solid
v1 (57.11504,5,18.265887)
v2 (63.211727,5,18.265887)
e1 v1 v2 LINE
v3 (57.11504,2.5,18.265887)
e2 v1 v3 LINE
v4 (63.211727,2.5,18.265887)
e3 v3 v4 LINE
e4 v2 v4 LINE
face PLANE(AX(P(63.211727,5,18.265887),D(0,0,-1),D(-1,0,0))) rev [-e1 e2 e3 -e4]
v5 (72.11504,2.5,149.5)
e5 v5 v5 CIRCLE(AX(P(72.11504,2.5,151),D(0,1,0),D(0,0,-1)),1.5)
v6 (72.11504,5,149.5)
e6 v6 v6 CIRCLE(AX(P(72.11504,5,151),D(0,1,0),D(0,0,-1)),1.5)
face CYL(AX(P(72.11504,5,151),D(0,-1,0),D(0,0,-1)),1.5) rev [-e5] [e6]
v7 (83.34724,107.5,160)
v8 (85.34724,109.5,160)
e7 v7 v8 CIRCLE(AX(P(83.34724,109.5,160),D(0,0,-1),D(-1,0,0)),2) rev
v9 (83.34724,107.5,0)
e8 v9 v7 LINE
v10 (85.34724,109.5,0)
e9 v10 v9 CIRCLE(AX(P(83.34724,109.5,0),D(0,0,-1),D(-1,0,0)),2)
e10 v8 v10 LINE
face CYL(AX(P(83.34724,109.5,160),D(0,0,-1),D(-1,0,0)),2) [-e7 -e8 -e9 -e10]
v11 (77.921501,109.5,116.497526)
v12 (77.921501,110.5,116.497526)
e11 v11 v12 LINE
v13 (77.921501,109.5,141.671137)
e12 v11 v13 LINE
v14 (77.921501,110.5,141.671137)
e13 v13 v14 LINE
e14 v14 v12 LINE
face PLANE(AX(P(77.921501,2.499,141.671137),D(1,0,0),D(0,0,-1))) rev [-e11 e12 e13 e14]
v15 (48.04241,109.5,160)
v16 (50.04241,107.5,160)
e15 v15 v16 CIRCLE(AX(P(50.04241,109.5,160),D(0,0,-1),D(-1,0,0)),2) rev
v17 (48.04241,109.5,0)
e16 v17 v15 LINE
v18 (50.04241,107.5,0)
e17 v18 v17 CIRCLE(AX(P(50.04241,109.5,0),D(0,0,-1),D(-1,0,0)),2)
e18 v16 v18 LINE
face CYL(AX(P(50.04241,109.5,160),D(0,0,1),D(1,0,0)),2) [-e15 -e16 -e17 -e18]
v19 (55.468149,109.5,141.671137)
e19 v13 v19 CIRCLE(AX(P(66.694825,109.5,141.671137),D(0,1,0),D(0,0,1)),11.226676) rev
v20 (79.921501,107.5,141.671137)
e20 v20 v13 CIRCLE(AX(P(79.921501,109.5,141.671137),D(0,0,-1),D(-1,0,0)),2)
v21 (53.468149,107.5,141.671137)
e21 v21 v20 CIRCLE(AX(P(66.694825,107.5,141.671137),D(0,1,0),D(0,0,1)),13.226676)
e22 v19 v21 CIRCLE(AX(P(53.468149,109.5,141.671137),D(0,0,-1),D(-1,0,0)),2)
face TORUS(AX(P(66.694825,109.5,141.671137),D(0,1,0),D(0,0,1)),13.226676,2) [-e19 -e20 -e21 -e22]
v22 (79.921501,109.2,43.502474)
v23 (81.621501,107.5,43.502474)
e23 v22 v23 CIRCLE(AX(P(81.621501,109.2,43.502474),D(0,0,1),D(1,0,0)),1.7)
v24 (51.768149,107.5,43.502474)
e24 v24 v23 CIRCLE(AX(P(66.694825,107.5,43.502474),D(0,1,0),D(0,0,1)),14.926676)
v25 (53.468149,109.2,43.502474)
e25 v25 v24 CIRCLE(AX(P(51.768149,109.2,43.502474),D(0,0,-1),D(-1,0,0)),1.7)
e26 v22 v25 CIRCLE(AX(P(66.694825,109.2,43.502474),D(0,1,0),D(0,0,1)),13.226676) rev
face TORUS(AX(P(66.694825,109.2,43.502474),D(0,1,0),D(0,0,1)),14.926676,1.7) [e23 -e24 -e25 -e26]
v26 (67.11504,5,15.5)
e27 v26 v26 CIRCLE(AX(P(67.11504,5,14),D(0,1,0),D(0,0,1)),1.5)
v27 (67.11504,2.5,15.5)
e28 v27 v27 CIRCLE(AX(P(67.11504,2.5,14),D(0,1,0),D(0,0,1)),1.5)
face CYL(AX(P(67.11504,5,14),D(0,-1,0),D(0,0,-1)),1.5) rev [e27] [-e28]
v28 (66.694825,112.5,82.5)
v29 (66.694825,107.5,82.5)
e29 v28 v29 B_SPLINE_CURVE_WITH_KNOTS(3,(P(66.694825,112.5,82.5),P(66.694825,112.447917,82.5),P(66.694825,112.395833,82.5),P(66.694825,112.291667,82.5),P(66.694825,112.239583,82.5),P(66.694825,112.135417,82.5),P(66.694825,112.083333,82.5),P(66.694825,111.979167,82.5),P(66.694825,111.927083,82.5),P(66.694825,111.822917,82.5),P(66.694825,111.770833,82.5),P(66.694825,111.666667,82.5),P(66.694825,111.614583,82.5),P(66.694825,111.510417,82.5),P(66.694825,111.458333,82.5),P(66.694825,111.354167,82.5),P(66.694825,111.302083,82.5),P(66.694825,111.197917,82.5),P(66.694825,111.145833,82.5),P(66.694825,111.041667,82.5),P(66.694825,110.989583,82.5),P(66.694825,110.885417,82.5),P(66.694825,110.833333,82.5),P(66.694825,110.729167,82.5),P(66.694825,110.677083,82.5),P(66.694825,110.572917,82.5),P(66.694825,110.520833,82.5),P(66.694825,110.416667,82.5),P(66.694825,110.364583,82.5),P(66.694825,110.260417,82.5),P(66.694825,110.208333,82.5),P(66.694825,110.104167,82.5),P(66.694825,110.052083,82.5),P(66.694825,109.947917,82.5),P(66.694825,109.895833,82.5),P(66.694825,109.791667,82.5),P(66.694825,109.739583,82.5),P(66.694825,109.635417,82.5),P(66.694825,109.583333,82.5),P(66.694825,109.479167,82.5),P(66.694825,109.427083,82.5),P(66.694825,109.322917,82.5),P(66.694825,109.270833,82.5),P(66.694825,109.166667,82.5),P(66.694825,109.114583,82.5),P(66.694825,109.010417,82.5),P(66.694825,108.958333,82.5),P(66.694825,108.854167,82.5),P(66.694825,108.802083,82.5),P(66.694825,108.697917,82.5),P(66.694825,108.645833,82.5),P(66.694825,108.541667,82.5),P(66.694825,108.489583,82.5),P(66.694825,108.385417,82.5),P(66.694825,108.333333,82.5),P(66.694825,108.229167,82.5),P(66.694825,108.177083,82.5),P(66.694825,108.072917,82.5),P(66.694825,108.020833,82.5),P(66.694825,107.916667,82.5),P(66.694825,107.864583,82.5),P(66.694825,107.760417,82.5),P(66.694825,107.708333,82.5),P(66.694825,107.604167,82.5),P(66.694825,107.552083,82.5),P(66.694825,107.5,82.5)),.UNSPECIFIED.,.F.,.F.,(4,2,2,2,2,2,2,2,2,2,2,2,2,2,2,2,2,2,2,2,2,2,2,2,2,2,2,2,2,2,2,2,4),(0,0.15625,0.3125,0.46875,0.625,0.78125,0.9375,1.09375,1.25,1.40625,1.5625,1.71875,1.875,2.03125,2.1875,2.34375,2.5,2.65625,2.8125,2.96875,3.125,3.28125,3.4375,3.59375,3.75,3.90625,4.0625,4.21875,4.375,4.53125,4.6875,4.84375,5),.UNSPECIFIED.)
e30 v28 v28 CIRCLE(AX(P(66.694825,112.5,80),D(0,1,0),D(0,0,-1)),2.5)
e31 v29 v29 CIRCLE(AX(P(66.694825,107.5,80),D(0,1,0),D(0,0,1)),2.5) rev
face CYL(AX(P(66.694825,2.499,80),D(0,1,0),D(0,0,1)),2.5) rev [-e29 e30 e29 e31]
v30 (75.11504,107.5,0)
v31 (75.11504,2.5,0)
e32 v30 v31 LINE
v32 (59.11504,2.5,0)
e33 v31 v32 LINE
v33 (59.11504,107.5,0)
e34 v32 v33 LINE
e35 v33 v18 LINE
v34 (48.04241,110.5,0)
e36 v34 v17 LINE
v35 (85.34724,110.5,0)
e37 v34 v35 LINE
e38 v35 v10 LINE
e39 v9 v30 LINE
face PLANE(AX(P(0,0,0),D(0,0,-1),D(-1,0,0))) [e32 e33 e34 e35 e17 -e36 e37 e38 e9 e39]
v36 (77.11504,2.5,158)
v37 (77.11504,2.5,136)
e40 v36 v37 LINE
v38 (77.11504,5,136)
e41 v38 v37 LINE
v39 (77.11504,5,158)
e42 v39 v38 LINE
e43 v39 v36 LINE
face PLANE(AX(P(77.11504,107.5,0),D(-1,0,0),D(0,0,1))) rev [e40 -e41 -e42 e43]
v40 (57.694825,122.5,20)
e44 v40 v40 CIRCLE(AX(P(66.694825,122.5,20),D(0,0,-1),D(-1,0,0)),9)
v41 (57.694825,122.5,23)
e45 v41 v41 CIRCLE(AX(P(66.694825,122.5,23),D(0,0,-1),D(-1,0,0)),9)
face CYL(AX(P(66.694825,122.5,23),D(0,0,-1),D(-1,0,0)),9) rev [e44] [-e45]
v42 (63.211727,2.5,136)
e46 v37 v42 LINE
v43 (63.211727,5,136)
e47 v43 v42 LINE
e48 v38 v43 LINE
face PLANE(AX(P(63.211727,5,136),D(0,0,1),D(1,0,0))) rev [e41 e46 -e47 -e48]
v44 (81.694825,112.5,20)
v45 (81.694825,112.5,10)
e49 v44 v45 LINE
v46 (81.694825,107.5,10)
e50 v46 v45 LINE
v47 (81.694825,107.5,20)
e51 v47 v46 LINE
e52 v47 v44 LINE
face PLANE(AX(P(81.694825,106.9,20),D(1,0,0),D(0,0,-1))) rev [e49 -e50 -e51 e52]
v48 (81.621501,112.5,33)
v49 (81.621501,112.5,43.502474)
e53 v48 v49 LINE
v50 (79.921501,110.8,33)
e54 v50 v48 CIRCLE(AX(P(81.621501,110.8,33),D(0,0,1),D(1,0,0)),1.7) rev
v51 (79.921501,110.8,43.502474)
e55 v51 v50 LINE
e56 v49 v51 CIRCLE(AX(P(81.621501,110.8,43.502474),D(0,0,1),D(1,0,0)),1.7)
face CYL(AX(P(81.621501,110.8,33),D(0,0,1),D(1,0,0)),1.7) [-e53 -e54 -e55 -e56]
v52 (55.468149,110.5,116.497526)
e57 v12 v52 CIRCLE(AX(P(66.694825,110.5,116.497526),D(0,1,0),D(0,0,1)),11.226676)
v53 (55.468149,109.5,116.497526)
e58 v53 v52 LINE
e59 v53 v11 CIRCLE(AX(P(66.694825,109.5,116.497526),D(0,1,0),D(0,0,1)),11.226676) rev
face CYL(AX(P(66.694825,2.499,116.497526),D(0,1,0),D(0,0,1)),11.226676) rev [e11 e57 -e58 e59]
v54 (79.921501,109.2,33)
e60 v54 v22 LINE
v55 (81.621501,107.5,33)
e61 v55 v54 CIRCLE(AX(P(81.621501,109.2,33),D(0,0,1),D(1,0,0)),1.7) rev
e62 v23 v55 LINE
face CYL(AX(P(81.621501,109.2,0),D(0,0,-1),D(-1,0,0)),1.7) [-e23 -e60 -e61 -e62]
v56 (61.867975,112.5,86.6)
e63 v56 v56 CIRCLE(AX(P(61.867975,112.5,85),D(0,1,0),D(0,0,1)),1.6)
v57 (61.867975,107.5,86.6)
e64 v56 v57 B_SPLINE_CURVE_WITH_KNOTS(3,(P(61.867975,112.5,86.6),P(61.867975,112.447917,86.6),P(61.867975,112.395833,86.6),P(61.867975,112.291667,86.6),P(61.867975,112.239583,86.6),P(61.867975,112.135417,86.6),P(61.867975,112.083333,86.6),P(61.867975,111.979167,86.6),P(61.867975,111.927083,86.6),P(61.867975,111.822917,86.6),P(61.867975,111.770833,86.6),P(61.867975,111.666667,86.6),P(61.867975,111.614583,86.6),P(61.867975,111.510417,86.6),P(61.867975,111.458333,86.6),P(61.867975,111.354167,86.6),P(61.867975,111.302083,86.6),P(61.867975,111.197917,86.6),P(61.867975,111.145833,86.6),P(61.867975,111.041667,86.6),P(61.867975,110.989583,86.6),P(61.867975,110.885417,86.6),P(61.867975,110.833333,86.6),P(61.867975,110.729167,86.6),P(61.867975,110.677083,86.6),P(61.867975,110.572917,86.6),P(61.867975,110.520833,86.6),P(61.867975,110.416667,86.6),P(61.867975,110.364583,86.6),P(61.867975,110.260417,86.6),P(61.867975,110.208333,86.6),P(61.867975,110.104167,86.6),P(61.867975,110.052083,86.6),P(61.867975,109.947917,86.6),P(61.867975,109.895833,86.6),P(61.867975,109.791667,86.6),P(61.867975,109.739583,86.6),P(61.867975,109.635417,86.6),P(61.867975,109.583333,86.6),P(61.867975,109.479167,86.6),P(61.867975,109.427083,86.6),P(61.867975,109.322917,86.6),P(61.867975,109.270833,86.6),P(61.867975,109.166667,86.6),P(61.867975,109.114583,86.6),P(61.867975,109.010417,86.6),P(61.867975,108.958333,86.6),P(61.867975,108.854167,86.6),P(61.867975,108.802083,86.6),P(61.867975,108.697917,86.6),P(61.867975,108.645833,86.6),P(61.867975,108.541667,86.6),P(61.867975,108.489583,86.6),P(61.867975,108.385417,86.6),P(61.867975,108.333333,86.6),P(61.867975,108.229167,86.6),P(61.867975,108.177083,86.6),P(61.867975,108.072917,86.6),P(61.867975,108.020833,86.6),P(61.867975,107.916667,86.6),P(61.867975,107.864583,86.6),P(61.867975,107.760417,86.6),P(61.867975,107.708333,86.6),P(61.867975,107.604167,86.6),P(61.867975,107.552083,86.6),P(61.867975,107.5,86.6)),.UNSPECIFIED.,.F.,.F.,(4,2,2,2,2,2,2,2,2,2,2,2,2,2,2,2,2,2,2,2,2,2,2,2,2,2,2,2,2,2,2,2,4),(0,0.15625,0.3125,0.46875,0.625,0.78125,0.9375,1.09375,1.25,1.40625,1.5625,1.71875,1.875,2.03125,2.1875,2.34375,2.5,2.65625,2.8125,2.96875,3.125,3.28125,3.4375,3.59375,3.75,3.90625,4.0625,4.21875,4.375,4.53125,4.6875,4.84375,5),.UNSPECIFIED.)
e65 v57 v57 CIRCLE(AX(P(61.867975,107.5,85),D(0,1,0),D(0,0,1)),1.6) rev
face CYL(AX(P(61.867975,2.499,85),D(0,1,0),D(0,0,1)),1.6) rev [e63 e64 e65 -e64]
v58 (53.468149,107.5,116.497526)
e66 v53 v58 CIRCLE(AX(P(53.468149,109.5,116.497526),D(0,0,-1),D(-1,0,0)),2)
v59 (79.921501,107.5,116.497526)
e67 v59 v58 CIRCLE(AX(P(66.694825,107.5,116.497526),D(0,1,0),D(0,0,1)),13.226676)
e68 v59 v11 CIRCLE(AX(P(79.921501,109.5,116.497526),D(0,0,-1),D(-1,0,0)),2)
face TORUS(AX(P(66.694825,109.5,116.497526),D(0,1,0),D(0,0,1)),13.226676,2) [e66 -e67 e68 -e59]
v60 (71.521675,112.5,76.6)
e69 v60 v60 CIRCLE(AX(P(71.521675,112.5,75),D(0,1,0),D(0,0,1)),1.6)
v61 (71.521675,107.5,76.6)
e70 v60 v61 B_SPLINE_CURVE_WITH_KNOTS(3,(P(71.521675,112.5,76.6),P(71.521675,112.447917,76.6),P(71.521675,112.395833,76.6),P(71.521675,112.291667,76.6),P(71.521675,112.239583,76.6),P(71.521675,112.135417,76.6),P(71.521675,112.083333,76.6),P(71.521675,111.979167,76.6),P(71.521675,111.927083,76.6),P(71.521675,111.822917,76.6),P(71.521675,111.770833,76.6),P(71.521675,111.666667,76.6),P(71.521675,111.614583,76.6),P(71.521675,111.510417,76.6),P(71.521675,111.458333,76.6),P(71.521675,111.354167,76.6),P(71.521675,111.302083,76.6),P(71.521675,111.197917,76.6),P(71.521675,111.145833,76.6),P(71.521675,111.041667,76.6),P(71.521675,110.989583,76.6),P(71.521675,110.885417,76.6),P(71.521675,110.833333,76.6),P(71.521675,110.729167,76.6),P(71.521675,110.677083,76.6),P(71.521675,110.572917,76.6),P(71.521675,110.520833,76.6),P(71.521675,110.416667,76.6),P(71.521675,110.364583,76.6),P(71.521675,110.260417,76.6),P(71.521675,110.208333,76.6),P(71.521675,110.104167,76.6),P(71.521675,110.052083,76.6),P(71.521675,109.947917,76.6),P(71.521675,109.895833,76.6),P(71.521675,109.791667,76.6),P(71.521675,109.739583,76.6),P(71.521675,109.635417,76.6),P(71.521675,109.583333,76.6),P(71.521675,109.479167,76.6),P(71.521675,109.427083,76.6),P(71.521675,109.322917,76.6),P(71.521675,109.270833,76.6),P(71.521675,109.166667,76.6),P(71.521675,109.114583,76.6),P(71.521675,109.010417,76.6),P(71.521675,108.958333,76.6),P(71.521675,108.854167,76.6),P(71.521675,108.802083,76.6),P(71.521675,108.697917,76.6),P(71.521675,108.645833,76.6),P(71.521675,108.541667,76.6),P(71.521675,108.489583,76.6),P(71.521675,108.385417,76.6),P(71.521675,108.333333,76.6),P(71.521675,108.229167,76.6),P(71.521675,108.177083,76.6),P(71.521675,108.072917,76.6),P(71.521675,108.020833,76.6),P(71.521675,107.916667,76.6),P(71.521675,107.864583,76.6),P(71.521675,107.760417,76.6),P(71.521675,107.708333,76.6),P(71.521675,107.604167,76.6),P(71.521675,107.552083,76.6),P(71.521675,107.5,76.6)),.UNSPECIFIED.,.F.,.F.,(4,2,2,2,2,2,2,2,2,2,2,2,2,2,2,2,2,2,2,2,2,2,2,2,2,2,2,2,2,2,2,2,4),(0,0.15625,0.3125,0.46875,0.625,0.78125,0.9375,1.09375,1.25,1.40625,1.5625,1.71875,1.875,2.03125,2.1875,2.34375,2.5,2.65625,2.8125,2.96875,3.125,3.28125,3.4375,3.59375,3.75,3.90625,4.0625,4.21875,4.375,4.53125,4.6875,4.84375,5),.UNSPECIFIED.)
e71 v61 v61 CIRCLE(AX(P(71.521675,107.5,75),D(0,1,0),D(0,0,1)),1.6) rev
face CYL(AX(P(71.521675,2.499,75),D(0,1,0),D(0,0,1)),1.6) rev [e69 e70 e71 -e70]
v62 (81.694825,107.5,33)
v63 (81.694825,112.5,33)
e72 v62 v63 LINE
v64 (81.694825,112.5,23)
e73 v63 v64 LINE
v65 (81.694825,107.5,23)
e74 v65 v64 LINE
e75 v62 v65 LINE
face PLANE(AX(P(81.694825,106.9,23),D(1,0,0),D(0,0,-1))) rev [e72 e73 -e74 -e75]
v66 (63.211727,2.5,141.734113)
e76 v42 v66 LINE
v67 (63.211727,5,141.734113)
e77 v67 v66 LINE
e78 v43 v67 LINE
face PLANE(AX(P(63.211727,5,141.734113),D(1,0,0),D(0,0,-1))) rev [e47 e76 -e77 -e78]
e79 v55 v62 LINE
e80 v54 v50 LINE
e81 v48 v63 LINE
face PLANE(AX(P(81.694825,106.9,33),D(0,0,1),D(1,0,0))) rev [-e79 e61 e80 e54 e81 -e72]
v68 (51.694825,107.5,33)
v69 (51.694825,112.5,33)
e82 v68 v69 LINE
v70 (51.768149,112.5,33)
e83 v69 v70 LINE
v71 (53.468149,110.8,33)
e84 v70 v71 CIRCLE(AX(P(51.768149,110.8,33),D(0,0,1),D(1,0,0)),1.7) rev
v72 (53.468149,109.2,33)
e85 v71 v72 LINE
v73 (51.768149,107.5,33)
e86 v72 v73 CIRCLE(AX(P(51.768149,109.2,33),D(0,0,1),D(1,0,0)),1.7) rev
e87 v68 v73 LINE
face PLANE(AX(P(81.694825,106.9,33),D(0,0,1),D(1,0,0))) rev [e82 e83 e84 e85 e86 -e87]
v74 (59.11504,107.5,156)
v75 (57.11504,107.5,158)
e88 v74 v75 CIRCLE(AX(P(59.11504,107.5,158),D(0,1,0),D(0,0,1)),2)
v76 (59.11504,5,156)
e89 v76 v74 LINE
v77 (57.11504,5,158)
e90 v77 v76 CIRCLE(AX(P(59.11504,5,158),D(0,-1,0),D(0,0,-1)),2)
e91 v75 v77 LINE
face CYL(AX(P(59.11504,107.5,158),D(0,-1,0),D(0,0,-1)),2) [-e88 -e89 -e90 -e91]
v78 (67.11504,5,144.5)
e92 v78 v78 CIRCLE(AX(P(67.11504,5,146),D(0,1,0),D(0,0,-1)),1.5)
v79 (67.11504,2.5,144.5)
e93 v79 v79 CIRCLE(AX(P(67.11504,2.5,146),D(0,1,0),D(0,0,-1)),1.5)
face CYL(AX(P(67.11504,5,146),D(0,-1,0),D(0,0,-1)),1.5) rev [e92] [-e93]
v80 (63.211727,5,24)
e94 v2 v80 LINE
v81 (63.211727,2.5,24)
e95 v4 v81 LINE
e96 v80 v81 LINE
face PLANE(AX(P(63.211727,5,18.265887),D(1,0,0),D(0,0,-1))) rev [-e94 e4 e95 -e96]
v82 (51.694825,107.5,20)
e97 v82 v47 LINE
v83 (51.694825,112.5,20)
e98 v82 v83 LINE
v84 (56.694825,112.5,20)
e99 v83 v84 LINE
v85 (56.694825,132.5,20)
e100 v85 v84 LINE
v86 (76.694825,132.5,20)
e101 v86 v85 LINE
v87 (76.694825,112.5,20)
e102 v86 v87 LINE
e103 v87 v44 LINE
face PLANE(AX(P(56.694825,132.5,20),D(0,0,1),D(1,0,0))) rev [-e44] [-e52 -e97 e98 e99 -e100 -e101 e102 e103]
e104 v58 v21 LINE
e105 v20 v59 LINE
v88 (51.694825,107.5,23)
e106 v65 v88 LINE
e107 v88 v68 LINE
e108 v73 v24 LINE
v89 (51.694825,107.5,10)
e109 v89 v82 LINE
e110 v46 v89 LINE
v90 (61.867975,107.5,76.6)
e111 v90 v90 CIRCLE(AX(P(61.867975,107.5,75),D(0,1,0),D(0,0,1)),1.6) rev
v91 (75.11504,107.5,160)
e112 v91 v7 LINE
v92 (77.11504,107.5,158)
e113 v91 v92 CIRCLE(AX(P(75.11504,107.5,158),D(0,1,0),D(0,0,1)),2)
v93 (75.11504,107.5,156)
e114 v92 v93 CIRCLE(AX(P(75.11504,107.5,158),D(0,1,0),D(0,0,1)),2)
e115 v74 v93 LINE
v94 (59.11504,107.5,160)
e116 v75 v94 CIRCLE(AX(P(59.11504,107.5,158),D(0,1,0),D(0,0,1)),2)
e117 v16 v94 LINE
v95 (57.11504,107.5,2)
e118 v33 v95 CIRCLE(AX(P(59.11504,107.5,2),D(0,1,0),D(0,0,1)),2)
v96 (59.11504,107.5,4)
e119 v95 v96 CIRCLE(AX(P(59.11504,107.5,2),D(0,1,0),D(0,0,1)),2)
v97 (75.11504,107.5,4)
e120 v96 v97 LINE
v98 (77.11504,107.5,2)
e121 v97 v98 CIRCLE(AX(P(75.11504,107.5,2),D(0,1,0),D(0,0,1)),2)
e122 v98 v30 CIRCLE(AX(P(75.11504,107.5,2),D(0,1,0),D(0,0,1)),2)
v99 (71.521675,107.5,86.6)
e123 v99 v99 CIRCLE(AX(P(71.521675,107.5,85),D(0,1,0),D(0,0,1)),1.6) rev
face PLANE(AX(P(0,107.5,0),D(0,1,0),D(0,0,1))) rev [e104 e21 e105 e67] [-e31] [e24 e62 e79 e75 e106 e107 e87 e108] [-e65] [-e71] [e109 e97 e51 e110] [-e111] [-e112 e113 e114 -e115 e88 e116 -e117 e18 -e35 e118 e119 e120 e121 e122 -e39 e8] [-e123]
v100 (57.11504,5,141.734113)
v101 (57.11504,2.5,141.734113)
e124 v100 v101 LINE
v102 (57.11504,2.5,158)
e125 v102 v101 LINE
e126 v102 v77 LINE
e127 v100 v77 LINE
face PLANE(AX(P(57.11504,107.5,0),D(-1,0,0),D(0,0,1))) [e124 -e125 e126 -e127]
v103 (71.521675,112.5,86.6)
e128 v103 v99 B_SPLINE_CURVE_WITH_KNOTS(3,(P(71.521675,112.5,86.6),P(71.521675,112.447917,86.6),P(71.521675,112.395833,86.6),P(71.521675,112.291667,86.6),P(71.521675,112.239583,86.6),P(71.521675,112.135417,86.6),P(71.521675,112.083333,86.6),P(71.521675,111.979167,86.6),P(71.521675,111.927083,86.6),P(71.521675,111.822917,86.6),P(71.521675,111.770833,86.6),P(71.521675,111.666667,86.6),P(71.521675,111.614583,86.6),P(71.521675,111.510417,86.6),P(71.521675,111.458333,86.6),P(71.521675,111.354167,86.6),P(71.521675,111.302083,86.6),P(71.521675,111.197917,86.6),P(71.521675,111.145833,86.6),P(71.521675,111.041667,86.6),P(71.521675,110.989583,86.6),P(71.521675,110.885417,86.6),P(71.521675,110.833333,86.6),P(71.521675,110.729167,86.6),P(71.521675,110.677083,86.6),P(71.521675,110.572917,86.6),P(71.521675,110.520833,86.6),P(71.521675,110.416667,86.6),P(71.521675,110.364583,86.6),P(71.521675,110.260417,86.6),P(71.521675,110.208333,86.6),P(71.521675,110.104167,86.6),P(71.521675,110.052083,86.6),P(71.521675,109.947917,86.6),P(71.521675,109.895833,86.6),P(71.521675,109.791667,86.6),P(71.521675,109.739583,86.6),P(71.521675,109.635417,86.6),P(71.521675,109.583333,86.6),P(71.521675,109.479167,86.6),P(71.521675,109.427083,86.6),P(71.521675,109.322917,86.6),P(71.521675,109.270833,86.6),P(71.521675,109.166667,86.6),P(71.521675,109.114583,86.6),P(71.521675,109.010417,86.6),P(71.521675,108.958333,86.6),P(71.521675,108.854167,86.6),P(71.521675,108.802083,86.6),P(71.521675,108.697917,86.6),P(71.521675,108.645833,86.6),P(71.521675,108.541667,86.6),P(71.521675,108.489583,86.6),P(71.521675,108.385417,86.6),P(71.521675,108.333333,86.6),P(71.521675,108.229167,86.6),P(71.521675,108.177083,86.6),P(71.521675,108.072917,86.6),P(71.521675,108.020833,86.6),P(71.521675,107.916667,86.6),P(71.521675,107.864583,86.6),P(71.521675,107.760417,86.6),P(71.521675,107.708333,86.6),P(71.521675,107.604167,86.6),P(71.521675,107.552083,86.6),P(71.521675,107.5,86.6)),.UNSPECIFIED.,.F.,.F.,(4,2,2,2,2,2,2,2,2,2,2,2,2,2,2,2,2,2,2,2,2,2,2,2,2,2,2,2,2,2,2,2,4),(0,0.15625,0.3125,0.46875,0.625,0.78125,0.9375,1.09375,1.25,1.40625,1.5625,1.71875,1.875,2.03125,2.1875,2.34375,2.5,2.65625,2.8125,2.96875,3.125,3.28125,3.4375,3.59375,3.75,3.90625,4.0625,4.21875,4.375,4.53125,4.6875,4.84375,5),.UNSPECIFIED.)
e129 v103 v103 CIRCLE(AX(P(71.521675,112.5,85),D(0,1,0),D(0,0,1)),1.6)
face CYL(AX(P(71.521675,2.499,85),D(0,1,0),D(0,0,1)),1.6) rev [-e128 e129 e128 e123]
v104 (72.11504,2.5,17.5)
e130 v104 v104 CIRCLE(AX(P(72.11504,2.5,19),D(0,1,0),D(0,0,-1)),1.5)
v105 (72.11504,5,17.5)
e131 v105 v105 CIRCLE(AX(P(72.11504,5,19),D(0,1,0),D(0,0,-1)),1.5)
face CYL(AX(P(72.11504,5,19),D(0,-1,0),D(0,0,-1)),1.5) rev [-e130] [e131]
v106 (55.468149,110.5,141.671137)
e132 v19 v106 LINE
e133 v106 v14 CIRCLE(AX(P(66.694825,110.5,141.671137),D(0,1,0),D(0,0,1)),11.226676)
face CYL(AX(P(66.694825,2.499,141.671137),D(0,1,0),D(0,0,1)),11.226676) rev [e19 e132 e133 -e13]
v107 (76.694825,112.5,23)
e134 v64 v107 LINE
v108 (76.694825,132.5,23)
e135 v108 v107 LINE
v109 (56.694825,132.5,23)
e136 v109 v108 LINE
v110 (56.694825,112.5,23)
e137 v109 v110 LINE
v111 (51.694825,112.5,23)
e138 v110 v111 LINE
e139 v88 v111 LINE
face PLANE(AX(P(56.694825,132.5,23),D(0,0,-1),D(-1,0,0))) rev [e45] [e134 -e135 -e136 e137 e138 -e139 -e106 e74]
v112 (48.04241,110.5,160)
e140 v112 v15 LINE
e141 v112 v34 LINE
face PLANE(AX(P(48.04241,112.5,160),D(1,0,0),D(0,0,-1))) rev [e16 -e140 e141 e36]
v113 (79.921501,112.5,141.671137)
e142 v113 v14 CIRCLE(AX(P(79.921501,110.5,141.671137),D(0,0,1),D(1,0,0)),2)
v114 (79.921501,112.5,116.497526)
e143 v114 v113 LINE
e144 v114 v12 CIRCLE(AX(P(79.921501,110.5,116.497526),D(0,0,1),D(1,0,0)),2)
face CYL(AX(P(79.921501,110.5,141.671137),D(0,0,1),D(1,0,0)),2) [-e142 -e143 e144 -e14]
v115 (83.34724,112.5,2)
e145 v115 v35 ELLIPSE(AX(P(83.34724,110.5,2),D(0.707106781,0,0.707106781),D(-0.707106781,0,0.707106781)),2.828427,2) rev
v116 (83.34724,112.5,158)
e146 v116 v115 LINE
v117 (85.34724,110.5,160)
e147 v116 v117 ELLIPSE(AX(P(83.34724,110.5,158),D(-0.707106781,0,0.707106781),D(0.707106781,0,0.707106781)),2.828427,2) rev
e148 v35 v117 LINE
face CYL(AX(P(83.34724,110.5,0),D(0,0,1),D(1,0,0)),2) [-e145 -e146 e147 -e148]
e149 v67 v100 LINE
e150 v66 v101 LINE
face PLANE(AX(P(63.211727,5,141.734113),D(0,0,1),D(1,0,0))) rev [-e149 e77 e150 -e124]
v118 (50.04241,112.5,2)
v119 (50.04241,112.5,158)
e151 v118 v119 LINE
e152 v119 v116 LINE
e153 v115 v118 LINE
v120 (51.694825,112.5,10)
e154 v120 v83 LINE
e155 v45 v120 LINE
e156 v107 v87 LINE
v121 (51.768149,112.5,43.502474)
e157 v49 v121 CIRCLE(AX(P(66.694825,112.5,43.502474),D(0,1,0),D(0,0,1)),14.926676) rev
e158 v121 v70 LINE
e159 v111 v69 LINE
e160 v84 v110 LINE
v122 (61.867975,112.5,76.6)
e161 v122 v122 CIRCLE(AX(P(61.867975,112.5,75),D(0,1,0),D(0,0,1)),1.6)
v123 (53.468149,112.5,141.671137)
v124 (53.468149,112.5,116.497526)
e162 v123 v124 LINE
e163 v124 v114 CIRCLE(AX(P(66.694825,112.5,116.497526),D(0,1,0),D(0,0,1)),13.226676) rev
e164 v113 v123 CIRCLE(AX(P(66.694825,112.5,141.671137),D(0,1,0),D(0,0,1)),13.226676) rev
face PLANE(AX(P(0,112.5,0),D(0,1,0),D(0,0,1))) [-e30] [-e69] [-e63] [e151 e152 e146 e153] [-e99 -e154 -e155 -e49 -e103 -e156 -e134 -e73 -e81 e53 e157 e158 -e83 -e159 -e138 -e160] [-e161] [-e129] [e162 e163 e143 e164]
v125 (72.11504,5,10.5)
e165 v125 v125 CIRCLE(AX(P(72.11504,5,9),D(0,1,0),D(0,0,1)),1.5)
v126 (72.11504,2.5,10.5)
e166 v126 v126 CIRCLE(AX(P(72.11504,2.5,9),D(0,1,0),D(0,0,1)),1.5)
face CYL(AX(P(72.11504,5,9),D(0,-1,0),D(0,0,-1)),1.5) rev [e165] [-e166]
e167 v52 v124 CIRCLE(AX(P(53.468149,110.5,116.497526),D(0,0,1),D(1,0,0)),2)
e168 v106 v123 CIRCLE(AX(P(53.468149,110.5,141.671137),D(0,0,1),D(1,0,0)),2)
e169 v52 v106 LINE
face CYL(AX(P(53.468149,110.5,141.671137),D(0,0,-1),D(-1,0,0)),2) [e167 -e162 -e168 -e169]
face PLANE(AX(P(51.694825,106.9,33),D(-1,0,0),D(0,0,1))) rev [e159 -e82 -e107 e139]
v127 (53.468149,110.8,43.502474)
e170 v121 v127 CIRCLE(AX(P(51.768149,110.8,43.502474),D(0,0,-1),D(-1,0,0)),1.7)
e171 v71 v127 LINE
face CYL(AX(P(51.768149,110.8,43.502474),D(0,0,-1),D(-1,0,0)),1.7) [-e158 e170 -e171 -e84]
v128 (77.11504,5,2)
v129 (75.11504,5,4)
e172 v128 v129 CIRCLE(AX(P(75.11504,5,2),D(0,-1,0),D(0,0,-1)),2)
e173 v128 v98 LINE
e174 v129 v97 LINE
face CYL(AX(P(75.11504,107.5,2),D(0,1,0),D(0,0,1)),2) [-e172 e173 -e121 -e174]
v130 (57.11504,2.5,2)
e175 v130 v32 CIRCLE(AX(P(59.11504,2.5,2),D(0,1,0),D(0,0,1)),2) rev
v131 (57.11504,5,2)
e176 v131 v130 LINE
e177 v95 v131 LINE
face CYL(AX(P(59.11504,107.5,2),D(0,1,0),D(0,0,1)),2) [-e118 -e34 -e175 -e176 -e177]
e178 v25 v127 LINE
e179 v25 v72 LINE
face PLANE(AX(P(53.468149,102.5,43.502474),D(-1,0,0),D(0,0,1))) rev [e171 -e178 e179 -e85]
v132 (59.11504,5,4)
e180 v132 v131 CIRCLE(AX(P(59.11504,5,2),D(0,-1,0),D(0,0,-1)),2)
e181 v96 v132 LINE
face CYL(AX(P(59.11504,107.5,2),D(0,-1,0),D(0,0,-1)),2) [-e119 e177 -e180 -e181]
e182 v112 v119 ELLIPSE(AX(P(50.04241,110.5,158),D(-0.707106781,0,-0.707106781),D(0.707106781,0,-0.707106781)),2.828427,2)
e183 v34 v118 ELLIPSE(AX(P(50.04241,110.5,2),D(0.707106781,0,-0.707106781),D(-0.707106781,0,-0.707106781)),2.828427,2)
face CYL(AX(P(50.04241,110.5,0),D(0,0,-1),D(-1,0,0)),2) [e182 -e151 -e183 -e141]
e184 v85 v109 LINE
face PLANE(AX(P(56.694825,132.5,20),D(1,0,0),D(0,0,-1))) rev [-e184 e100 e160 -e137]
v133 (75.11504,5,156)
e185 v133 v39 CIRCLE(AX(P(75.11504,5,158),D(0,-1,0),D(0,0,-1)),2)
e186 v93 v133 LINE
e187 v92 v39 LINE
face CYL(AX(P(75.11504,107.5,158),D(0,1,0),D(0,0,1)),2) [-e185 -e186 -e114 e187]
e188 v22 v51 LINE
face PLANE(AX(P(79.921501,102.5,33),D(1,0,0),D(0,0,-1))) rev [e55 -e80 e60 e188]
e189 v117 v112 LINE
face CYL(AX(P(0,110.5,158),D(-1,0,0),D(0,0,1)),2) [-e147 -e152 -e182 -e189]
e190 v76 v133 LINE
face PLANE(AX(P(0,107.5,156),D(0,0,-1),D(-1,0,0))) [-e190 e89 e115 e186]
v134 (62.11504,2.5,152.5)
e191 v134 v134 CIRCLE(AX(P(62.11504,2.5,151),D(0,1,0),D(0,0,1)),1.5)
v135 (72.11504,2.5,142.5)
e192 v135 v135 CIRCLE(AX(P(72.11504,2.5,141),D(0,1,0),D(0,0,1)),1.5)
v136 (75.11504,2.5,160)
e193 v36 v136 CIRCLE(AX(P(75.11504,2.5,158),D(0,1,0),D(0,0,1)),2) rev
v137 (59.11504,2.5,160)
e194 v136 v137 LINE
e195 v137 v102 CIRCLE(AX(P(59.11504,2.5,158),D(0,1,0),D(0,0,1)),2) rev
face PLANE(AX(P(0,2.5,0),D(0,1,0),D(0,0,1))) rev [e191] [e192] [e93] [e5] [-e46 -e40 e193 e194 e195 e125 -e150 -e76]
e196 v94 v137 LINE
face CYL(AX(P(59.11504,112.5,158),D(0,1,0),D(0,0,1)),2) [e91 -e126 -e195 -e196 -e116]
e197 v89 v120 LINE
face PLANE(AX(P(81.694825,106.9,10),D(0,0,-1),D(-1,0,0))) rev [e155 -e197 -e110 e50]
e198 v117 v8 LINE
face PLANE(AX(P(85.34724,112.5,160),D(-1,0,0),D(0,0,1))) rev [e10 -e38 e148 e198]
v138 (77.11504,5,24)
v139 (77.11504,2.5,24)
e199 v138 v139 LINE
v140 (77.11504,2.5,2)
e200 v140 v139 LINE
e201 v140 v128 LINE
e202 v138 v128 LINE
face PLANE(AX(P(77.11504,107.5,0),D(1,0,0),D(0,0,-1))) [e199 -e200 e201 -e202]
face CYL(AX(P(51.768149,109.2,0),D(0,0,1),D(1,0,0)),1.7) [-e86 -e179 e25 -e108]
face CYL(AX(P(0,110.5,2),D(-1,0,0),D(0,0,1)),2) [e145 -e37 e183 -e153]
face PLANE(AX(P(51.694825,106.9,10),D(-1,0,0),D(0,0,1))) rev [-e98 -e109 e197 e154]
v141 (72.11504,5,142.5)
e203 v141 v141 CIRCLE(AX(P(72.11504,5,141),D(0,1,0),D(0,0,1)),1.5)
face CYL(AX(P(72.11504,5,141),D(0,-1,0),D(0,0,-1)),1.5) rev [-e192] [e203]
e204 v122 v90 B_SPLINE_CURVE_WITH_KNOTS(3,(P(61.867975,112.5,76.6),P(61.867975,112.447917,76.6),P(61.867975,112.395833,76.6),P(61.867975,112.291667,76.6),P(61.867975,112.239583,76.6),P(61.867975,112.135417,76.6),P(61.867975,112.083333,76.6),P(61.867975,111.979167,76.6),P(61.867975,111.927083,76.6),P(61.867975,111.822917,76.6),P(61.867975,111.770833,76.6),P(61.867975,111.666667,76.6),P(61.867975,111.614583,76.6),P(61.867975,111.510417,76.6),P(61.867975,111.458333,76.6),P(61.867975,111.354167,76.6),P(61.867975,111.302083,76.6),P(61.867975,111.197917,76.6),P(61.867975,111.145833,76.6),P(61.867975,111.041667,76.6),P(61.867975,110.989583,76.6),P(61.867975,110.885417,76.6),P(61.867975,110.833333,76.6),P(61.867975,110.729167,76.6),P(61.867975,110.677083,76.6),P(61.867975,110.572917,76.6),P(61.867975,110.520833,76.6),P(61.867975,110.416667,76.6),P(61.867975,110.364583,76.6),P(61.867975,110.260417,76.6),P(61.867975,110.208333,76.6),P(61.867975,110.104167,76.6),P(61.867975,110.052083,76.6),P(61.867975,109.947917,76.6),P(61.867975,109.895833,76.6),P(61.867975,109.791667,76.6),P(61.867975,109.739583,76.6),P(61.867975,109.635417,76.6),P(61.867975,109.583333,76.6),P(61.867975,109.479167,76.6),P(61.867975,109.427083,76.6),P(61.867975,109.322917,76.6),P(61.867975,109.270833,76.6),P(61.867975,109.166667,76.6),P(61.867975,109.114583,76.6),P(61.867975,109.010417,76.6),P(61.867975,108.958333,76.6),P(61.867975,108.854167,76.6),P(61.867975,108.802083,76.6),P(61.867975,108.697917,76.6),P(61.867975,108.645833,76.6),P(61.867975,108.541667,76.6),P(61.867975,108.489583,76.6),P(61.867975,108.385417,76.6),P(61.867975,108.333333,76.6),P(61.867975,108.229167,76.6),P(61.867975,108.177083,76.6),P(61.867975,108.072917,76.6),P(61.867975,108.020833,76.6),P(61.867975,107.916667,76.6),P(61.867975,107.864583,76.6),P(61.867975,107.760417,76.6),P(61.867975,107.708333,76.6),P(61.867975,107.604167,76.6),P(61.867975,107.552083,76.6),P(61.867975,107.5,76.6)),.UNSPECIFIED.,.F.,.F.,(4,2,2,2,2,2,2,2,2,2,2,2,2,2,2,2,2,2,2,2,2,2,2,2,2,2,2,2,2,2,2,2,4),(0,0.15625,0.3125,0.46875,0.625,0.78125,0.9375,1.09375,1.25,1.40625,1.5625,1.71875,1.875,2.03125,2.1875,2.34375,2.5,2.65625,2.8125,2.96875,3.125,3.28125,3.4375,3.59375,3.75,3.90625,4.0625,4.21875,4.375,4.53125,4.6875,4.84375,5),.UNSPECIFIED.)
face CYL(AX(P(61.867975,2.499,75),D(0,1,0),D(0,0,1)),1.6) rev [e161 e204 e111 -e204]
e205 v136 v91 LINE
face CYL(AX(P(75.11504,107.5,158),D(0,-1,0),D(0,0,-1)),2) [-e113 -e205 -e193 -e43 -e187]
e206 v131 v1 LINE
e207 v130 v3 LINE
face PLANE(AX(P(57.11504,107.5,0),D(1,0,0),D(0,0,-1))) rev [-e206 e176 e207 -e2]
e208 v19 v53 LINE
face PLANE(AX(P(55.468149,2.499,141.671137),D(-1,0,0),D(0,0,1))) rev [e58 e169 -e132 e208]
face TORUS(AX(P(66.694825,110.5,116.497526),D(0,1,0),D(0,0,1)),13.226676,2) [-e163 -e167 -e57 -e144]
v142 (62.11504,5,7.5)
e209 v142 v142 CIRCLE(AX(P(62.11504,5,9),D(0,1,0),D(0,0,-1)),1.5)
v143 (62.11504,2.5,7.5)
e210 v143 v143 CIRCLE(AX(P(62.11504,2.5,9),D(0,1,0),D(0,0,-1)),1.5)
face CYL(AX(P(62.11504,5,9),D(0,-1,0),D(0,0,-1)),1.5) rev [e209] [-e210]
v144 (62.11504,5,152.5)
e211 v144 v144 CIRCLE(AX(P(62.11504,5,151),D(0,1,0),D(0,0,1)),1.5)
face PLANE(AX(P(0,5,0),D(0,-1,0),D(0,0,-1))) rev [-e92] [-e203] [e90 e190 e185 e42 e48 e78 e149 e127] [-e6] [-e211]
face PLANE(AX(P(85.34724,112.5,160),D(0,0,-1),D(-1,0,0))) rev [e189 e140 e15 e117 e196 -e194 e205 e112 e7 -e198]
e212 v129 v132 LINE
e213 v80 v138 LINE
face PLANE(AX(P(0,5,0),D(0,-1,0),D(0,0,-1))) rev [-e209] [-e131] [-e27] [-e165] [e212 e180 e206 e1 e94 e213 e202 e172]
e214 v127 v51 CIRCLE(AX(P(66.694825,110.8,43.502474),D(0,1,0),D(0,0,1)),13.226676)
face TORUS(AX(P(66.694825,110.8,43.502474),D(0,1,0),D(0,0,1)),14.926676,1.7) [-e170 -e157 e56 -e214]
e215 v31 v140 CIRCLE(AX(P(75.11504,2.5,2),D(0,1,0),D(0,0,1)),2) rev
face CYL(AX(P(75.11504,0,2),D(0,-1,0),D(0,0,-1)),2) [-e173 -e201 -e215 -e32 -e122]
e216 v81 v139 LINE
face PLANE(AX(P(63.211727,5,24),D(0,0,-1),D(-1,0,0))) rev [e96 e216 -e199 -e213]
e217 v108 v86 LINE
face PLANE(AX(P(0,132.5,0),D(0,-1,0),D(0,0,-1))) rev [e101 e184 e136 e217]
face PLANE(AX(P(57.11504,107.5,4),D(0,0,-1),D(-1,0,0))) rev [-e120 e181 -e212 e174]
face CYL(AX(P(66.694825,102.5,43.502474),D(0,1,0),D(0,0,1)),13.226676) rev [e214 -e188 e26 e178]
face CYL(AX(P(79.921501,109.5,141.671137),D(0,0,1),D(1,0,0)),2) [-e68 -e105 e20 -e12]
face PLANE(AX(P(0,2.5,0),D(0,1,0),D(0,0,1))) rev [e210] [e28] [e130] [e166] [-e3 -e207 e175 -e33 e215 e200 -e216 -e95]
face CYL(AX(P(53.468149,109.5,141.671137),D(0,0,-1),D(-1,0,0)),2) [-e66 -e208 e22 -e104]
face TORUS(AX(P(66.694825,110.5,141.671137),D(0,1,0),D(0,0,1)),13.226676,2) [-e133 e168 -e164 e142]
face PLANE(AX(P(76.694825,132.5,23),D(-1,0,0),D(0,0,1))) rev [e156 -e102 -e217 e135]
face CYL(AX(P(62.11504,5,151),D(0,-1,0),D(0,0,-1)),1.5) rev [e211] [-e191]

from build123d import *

# Parameters (mm, degrees)
EXTRUDE_2_DEPTH      = 160
SKETCH_20_W          = 20
SKETCH_20_H          = 4
EXTRUDE_5_DEPTH      = 105
SKETCH_24_R          = 1.5
EXTRUDE_7_DEPTH      = 2.5
SKETCH_25_W          = 203
SKETCH_25_H          = 2.5
CUT_EXTRUDE_16_DEPTH = 280.937939551
SKETCH_27_W          = 37.304830233
SKETCH_27_H          = 160
EXTRUDE_8_DEPTH      = 5
CUT_EXTRUDE_17_REACH = 214.095
SKETCH_28_R          = 1.6
SKETCH_28_R_2        = 2.5
SKETCH_29_W          = 20
SKETCH_29_H          = 3
EXTRUDE_9_DEPTH      = 20
SKETCH_30_R          = 9
CUT_EXTRUDE_18_DEPTH = 3
SKETCH_31_W          = 30
SKETCH_31_H          = 10
CUT_EXTRUDE_19_DEPTH = 5.6
FILLET_1_R           = 2
FILLET_2_R           = 2
FILLET_3_R           = 2
CUT_EXTRUDE_20_DEPTH = 10
FILLET_4_R           = 1.7


with BuildPart() as part:
    # 草图1 → 凸台-拉伸2 (new body)
    with BuildSketch(Plane.XY):
        Polygon((0, 0), (203, 0), (203, 2.5), (126.5, 2.5), (124, 2.5), (81.5, 2.5), (79, 2.5), (0, 2.5), align=None)
    extrude(amount=EXTRUDE_2_DEPTH)

    # 草图20 → 凸台-拉伸5 (add)
    with BuildSketch(Plane(origin=(0, 2.5, 0), x_dir=(1, 0, 0), z_dir=(0, 1, 0))):
        with Locations((67.115040288, -158)):
            Rectangle(SKETCH_20_W, SKETCH_20_H)
        with Locations((67.115040288, -2)):
            Rectangle(SKETCH_20_W, SKETCH_20_H)
    extrude(amount=EXTRUDE_5_DEPTH)

    # 草图24 → 凸台-拉伸7 (add)
    # profile 1 of 2: a face of its own
    with BuildSketch(Plane(origin=(0, 2.5, 0), x_dir=(1, 0, 0), z_dir=(0, 1, 0))):
        Polygon((57.115040288, -4), (77.115040288, -4), (77.115040288, -24), (63.211726749, -24), (63.211726749, -18.265887292), (57.115040288, -18.265887292), align=None)
        with Locations(Location((72.115040288, -9, 0), (0, 0, 270))):
            Circle(SKETCH_24_R, mode=Mode.SUBTRACT)
        with Locations(Location((67.115040288, -14, 0), (0, 0, 270))):
            Circle(SKETCH_24_R, mode=Mode.SUBTRACT)
        with Locations(Location((62.115040288, -9, 0), (0, 0, 90))):
            Circle(SKETCH_24_R, mode=Mode.SUBTRACT)
        with Locations(Location((72.115040288, -19, 0), (0, 0, 90))):
            Circle(SKETCH_24_R, mode=Mode.SUBTRACT)
    # profile 2 of 2: a face of its own
    with BuildSketch(Plane(origin=(0, 2.5, 0), x_dir=(1, 0, 0), z_dir=(0, 1, 0))):
        Polygon((63.211726749, -136), (77.115040288, -136), (77.115040288, -156), (57.115040288, -156), (57.115040288, -141.734112708), (63.211726749, -141.734112708), align=None)
        with Locations(Location((67.115040288, -146, 0), (0, 0, 90))):
            Circle(SKETCH_24_R, mode=Mode.SUBTRACT)
        with Locations(Location((72.115040288, -141, 0), (0, 0, 270))):
            Circle(SKETCH_24_R, mode=Mode.SUBTRACT)
        with Locations(Location((72.115040288, -151, 0), (0, 0, 90))):
            Circle(SKETCH_24_R, mode=Mode.SUBTRACT)
        with Locations(Location((62.115040288, -151, 0), (0, 0, 270))):
            Circle(SKETCH_24_R, mode=Mode.SUBTRACT)
    extrude(amount=EXTRUDE_7_DEPTH)

    # 草图25 → 切除-拉伸16 (cut, through all)
    with BuildSketch(Plane.XY.offset(160)):
        with Locations((101.5, 1.25)):
            Rectangle(SKETCH_25_W, SKETCH_25_H)
    extrude(amount=-CUT_EXTRUDE_16_DEPTH, mode=Mode.SUBTRACT)


with BuildPart() as cut_extrude_16_piece_1:
    # of the separate pieces the step leaves, piece 1, a body of its own (cut_extrude_16_pieces)
    add(part.part.solids().sort_by_distance((57.115040288, 2.5, 0))[0])



with BuildPart() as cut_extrude_16_piece_2:
    # of the separate pieces the step leaves, piece 2, a body of its own (cut_extrude_16_pieces)
    add(part.part.solids().sort_by_distance((57.115040288, 2.5, 160))[0])


with BuildPart() as cut_extrude_16_piece_1_1:
    add(cut_extrude_16_piece_1.part)

    add(cut_extrude_16_piece_2.part)  # 凸台-拉伸8 merges 切除-拉伸16 piece 2
    # 草图27 → 凸台-拉伸8 (add)
    with BuildSketch(Plane(origin=(0, 107.5, 0), x_dir=(1, 0, 0), z_dir=(0, 1, 0))):
        with Locations((66.694824847, -80)):
            Rectangle(SKETCH_27_W, SKETCH_27_H)
    extrude(amount=EXTRUDE_8_DEPTH)

    # 草图28 → 切除-拉伸17 (cut, up to next)
    with BuildSketch(Plane(origin=(0, 112.5, 0), x_dir=(1, 0, 0), z_dir=(0, 1, 0)), mode=Mode.PRIVATE) as cut_extrude_17_sk1:
        with Locations(Location((61.867974578, -75, 0), (0, 0, 270))):
            Circle(SKETCH_28_R)
    cut_extrude_17_tool1 = extrude(cut_extrude_17_sk1.sketch, amount=-CUT_EXTRUDE_17_REACH, mode=Mode.PRIVATE) & cut_extrude_16_piece_1_1.part
    # 草图28 → 切除-拉伸17 (cut, up to next)
    with BuildSketch(Plane(origin=(0, 112.5, 0), x_dir=(1, 0, 0), z_dir=(0, 1, 0)), mode=Mode.PRIVATE) as cut_extrude_17_sk2:
        with Locations(Location((61.867974578, -85, 0), (0, 0, 270))):
            Circle(SKETCH_28_R)
    cut_extrude_17_tool2 = extrude(cut_extrude_17_sk2.sketch, amount=-CUT_EXTRUDE_17_REACH, mode=Mode.PRIVATE) & cut_extrude_16_piece_1_1.part
    # 草图28 → 切除-拉伸17 (cut, up to next)
    with BuildSketch(Plane(origin=(0, 112.5, 0), x_dir=(1, 0, 0), z_dir=(0, 1, 0)), mode=Mode.PRIVATE) as cut_extrude_17_sk3:
        with Locations(Location((66.694824846, -80, 0), (0, 0, 270))):
            Circle(SKETCH_28_R_2)
    cut_extrude_17_tool3 = extrude(cut_extrude_17_sk3.sketch, amount=-CUT_EXTRUDE_17_REACH, mode=Mode.PRIVATE) & cut_extrude_16_piece_1_1.part
    # 草图28 → 切除-拉伸17 (cut, up to next)
    with BuildSketch(Plane(origin=(0, 112.5, 0), x_dir=(1, 0, 0), z_dir=(0, 1, 0)), mode=Mode.PRIVATE) as cut_extrude_17_sk4:
        with Locations(Location((71.521675114, -75, 0), (0, 0, 270))):
            Circle(SKETCH_28_R)
    cut_extrude_17_tool4 = extrude(cut_extrude_17_sk4.sketch, amount=-CUT_EXTRUDE_17_REACH, mode=Mode.PRIVATE) & cut_extrude_16_piece_1_1.part
    # 草图28 → 切除-拉伸17 (cut, up to next)
    with BuildSketch(Plane(origin=(0, 112.5, 0), x_dir=(1, 0, 0), z_dir=(0, 1, 0)), mode=Mode.PRIVATE) as cut_extrude_17_sk5:
        with Locations(Location((71.521675114, -85, 0), (0, 0, 270))):
            Circle(SKETCH_28_R)
    cut_extrude_17_tool5 = extrude(cut_extrude_17_sk5.sketch, amount=-CUT_EXTRUDE_17_REACH, mode=Mode.PRIVATE) & cut_extrude_16_piece_1_1.part
    # 草图28 → 切除-拉伸17 (cut, up to next)
    with BuildSketch(Plane(origin=(0, 112.5, 0), x_dir=(1, 0, 0), z_dir=(0, 1, 0)), mode=Mode.PRIVATE) as cut_extrude_17_sk6:
        with BuildLine():
            Line((77.92150076, -141.671137219), (77.92150076, -116.497525995))
            ThreePointArc((77.92150076, -116.497525995), (66.694824846, -105.270850081), (55.468148932, -116.497525995))
            Line((55.468148932, -116.497525995), (55.468148932, -141.671137219))
            ThreePointArc((55.468148932, -141.671137219), (66.694824846, -152.897813133), (77.92150076, -141.671137219))
        make_face()
    cut_extrude_17_tool6 = extrude(cut_extrude_17_sk6.sketch, amount=-CUT_EXTRUDE_17_REACH, mode=Mode.PRIVATE) & cut_extrude_16_piece_1_1.part
    add(cut_extrude_17_tool1.solids().sort_by_distance((61.867975, 112.5, 75))[0], mode=Mode.SUBTRACT)
    add(cut_extrude_17_tool2.solids().sort_by_distance((61.867975, 112.5, 85))[0], mode=Mode.SUBTRACT)
    add(cut_extrude_17_tool3.solids().sort_by_distance((66.694825, 112.5, 80))[0], mode=Mode.SUBTRACT)
    add(cut_extrude_17_tool4.solids().sort_by_distance((71.521675, 112.5, 75))[0], mode=Mode.SUBTRACT)
    add(cut_extrude_17_tool5.solids().sort_by_distance((71.521675, 112.5, 85))[0], mode=Mode.SUBTRACT)
    add(cut_extrude_17_tool6.solids().sort_by_distance((66.694825, 112.5, 129.084332))[0], mode=Mode.SUBTRACT)

    # 草图29 → 凸台-拉伸9 (add)
    with BuildSketch(Plane(origin=(0, 112.5, 0), x_dir=(1, 0, 0), z_dir=(0, 1, 0))):
        with Locations((66.694824846, -21.5)):
            Rectangle(SKETCH_29_W, SKETCH_29_H)
    extrude(amount=EXTRUDE_9_DEPTH)

    # 草图30 → 切除-拉伸18 (cut)
    with BuildSketch(Plane(origin=(0, 0, 20), x_dir=(-1, 0, 0), z_dir=(0, 0, -1))):
        with Locations((-66.694824846, 122.5)):
            Circle(SKETCH_30_R)
    extrude(amount=-CUT_EXTRUDE_18_DEPTH, mode=Mode.SUBTRACT)

    # 草图31 → 切除-拉伸19 (cut)
    with BuildSketch(Plane(origin=(0, 112.5, 0), x_dir=(1, 0, 0), z_dir=(0, 1, 0))):
        with Locations((66.694824846, -15)):
            Rectangle(SKETCH_31_W, SKETCH_31_H)
        with Locations((66.694824846, -28)):
            Rectangle(SKETCH_31_W, SKETCH_31_H)
    extrude(amount=-CUT_EXTRUDE_19_DEPTH, mode=Mode.SUBTRACT)

    # 圆角1
    fillet_1_edges = [cut_extrude_16_piece_1_1.edges().sort_by_distance(p)[0] for p in [
        (85.347239963, 107.5, 80),
        (48.04240973, 107.5, 80),
        (85.347239963, 112.5, 80),
        (66.694824846, 112.5, 0),
        (48.04240973, 112.5, 80),
        (66.694824846, 112.5, 160),
    ]]
    fillet(fillet_1_edges, radius=FILLET_1_R)

    # 圆角2
    fillet_2_edges = [cut_extrude_16_piece_1_1.edges().sort_by_distance(p)[0] for p in [
        (57.115040288, 55, 160),
        (57.115040288, 56.25, 156),
        (77.115040288, 56.25, 156),
        (77.115040288, 55, 160),
        (77.115040288, 56.25, 4),
        (77.115040288, 55, 0),
        (57.115040288, 56.25, 4),
        (57.115040288, 55, 0),
    ]]
    fillet(fillet_2_edges, radius=FILLET_2_R - 0.0001)  # a hair under: the kernel refuses the full size

    # 圆角3
    fillet_3_edges = [cut_extrude_16_piece_1_1.edges().sort_by_distance(p)[0] for p in [
        (66.694824846, 112.5, 152.897813133),
        (77.92150076, 112.5, 129.084331607),
        (66.694824846, 112.5, 105.270850081),
        (55.468148932, 112.5, 129.084331607),
        (77.92150076, 107.5, 129.084331607),
        (66.694824846, 107.5, 152.897813133),
        (55.468148932, 107.5, 129.084331607),
        (66.694824846, 107.5, 105.270850081),
    ]]
    fillet(fillet_3_edges, radius=FILLET_3_R)

    # 草图33 → 切除-拉伸20 (cut)
    with BuildSketch(Plane(origin=(0, 112.5, 0), x_dir=(1, 0, 0), z_dir=(0, 1, 0))):
        with BuildLine():
            Line((53.468148932, -43.502474005), (53.468148932, -33))
            Line((53.468148932, -33), (79.92150076, -33))
            Line((79.92150076, -33), (79.92150076, -43.502474005))
            ThreePointArc((79.92150076, -43.502474005), (66.694824846, -56.729149919), (53.468148932, -43.502474005))
        make_face()
    extrude(amount=-CUT_EXTRUDE_20_DEPTH, mode=Mode.SUBTRACT)

    # 圆角4
    fillet_4_edges = [cut_extrude_16_piece_1_1.edges().sort_by_distance(p)[0] for p in [
        (66.694824846, 107.5, 56.729149919),
        (79.92150076, 107.5, 38.251237003),
        (53.468148932, 107.5, 38.251237003),
        (53.468148932, 112.5, 38.251237003),
        (66.694824846, 112.5, 56.729149919),
        (79.92150076, 112.5, 38.251237003),
    ]]
    fillet(fillet_4_edges, radius=FILLET_4_R)


solid = cut_extrude_16_piece_1_1.part
